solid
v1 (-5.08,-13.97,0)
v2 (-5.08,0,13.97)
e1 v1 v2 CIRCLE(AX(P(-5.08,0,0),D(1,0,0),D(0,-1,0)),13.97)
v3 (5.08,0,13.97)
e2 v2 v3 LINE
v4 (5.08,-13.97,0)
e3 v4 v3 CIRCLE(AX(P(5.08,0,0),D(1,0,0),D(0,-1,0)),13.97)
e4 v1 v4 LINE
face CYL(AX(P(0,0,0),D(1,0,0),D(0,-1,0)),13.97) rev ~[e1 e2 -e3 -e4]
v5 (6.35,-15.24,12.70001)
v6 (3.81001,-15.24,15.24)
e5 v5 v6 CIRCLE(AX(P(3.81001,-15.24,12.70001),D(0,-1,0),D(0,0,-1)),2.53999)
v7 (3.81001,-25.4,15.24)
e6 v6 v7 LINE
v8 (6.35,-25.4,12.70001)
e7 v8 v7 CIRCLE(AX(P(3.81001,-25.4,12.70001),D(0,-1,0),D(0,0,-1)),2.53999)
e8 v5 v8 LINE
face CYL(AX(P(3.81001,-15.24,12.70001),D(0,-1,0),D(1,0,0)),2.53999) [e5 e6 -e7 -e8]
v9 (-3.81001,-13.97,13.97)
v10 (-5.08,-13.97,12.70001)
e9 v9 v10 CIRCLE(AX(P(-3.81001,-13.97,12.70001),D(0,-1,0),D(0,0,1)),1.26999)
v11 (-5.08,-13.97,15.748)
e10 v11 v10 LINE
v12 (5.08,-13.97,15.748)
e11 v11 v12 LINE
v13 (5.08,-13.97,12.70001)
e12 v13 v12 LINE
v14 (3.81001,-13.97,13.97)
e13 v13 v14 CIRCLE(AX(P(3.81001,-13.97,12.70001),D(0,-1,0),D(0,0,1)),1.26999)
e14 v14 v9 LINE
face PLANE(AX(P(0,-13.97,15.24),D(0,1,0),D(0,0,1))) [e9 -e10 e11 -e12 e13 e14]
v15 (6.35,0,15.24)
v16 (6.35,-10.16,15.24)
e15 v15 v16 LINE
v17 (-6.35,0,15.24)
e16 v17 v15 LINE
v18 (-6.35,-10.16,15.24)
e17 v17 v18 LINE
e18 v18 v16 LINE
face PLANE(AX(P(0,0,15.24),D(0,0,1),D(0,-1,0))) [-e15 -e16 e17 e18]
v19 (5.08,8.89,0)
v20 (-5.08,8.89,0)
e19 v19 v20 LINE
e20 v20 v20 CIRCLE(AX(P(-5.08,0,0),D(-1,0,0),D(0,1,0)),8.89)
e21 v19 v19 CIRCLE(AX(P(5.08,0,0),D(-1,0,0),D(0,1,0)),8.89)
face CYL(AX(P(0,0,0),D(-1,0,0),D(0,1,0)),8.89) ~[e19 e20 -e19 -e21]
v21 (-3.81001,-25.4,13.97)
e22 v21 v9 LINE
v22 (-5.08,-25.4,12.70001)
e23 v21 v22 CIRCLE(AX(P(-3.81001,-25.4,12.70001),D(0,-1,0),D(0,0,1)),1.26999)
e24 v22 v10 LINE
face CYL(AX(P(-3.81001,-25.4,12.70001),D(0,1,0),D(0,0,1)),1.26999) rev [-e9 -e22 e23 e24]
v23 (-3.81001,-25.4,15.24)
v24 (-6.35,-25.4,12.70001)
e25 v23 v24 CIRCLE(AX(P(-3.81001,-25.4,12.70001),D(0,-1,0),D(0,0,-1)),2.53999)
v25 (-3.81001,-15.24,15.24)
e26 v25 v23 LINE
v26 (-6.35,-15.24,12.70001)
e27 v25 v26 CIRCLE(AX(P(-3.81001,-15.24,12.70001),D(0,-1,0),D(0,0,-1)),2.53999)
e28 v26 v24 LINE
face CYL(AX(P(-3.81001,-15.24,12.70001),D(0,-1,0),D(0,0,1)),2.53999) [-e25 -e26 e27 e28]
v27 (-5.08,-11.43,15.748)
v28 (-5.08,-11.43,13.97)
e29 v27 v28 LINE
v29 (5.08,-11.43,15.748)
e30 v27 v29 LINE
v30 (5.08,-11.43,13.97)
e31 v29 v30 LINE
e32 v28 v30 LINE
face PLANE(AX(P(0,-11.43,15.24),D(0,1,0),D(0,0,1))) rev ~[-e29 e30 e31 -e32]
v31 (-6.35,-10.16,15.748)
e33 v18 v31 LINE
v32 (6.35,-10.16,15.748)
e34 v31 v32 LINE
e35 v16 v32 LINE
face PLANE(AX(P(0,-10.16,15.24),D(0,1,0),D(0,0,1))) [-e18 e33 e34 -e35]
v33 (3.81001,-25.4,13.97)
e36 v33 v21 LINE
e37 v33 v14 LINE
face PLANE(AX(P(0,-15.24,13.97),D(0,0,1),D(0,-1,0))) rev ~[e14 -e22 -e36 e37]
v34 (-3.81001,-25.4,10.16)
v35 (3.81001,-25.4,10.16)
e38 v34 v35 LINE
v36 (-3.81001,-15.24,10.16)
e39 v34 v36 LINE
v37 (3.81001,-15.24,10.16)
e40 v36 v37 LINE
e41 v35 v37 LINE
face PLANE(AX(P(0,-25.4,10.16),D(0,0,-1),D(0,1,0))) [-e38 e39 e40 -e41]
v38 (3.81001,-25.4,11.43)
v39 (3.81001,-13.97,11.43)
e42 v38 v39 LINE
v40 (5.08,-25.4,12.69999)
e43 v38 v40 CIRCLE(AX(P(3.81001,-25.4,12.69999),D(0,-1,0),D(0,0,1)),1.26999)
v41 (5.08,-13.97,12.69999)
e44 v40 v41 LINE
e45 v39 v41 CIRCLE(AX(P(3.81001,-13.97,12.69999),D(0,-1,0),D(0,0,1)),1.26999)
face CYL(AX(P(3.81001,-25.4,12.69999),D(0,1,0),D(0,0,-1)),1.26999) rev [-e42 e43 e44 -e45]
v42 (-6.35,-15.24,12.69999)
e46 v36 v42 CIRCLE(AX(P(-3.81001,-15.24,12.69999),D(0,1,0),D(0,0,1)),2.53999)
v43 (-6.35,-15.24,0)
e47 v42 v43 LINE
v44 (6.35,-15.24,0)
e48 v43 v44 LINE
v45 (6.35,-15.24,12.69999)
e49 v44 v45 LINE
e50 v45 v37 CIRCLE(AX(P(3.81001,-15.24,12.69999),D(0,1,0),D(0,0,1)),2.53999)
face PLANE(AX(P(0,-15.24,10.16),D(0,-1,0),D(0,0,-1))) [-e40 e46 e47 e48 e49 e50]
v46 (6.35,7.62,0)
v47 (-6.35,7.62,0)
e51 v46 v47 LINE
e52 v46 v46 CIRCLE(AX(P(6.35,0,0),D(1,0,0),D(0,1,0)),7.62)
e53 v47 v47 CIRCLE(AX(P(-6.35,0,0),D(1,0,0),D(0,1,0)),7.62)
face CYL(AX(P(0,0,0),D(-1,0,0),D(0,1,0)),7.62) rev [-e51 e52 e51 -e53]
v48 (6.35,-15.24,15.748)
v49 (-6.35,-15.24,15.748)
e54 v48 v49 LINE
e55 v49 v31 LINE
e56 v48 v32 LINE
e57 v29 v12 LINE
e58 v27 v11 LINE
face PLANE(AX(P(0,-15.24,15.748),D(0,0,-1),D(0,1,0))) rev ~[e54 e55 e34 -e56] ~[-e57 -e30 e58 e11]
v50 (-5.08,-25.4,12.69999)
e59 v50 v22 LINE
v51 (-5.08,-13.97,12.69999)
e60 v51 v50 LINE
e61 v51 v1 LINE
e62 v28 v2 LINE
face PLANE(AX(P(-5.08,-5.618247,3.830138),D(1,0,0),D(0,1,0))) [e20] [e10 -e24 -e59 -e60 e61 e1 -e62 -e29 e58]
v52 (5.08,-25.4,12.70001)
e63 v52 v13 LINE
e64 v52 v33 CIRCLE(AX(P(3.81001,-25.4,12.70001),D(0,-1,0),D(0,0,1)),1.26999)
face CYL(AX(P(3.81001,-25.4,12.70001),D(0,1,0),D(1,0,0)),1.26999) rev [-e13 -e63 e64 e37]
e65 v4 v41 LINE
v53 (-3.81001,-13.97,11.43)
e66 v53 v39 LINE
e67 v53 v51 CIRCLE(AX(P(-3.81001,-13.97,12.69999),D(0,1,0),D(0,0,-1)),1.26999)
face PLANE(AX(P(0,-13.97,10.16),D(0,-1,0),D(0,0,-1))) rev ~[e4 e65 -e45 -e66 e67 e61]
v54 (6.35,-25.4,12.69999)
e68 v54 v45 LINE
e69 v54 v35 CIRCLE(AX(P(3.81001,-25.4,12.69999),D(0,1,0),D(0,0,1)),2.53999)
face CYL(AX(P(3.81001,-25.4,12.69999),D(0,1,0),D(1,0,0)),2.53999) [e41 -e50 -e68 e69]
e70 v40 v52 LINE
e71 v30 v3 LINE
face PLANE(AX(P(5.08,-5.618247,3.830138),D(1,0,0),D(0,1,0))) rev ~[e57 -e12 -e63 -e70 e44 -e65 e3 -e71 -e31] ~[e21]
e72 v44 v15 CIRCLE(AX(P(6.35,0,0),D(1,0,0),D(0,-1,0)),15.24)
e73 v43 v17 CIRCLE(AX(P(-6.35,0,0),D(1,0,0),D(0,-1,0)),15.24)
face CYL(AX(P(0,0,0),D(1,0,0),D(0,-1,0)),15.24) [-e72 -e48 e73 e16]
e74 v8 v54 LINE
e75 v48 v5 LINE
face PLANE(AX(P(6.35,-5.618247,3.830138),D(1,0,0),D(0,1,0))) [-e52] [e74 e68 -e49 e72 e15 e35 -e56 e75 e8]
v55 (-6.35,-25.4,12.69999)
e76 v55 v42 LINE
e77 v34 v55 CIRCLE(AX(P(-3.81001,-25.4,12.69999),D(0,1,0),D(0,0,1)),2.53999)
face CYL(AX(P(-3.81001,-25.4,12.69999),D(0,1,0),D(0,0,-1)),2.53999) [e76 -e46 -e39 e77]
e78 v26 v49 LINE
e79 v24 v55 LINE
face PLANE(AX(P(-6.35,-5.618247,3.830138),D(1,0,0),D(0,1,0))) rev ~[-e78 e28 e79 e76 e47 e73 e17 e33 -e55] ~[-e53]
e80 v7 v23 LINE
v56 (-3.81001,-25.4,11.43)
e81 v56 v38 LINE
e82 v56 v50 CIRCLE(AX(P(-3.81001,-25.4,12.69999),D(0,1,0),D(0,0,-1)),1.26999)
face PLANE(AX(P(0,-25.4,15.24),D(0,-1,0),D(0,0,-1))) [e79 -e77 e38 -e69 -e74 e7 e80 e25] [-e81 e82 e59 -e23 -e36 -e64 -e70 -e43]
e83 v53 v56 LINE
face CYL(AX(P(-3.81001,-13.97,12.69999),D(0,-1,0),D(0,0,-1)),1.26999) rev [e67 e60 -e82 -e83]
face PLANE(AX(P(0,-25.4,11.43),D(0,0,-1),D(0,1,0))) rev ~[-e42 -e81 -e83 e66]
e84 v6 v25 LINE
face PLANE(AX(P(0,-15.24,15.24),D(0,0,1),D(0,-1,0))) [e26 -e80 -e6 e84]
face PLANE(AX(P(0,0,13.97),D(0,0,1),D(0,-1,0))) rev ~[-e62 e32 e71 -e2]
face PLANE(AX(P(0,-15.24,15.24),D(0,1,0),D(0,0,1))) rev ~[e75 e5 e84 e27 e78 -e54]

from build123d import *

# Parameters (mm, degrees)
F0_R     = 7.62
F0_W     = 5.08
F0_H     = 0.508
F1_DEPTH = 6.35
F2_T     = -1.27
F3_R     = 2.53999
F4_R     = 1.26999


# Not quite as in the source:
# - a fillet or chamfer is up to 0.001 mm smaller than in the source, because OpenCascade refuses the exact size


with BuildPart() as f1:
    # F0 (on Right) → F1 (new body, symmetric)
    with BuildSketch(Plane.YZ):
        with BuildLine():
            Line((-15.24, 15.24), (-25.4, 15.24))
            Line((-25.4, 15.24), (-25.4, 10.16))
            Line((-25.4, 10.16), (-15.24, 10.16))
            Line((-15.24, 10.16), (-15.24, 0))
            ThreePointArc((-15.24, 0), (10.7763073453, -10.7763073453), (0, 15.24))
            Line((0, 15.24), (-10.16, 15.24))
            Line((-10.16, 15.24), (-15.24, 15.24))
        make_face()
        Circle(F0_R, mode=Mode.SUBTRACT)
        with Locations((-12.7, 15.494)):
            Rectangle(F0_W, F0_H)
    extrude(amount=F1_DEPTH, both=True)

    # F2
    f2_openings = [f1.faces().sort_by_distance(p)[0] for p in [
        (0, -25.4, 12.7),
        (0, -12.7, 15.748),
    ]]
    offset(amount=F2_T, openings=f2_openings, kind=Kind.INTERSECTION)

    # F3 (radius 2.54 in the source; OpenCascade refuses exactly that, so slightly less here)
    f3_edges = [f1.edges().sort_by_distance(p)[0] for p in [
        (-6.35, -20.32, 15.24),
        (-6.35, -20.32, 10.16),
        (6.35, -20.32, 15.24),
        (6.35, -20.32, 10.16),
    ]]
    fillet(f3_edges, radius=F3_R)

    # F4 (radius 1.27 in the source; OpenCascade refuses exactly that, so slightly less here)
    f4_edges = [f1.edges().sort_by_distance(p)[0] for p in [
        (-5.08, -19.685, 11.43),
        (-5.08, -19.685, 13.97),
        (5.08, -19.685, 13.97),
        (5.08, -19.685, 11.43),
    ]]
    fillet(f4_edges, radius=F4_R)


solid = f1.part
